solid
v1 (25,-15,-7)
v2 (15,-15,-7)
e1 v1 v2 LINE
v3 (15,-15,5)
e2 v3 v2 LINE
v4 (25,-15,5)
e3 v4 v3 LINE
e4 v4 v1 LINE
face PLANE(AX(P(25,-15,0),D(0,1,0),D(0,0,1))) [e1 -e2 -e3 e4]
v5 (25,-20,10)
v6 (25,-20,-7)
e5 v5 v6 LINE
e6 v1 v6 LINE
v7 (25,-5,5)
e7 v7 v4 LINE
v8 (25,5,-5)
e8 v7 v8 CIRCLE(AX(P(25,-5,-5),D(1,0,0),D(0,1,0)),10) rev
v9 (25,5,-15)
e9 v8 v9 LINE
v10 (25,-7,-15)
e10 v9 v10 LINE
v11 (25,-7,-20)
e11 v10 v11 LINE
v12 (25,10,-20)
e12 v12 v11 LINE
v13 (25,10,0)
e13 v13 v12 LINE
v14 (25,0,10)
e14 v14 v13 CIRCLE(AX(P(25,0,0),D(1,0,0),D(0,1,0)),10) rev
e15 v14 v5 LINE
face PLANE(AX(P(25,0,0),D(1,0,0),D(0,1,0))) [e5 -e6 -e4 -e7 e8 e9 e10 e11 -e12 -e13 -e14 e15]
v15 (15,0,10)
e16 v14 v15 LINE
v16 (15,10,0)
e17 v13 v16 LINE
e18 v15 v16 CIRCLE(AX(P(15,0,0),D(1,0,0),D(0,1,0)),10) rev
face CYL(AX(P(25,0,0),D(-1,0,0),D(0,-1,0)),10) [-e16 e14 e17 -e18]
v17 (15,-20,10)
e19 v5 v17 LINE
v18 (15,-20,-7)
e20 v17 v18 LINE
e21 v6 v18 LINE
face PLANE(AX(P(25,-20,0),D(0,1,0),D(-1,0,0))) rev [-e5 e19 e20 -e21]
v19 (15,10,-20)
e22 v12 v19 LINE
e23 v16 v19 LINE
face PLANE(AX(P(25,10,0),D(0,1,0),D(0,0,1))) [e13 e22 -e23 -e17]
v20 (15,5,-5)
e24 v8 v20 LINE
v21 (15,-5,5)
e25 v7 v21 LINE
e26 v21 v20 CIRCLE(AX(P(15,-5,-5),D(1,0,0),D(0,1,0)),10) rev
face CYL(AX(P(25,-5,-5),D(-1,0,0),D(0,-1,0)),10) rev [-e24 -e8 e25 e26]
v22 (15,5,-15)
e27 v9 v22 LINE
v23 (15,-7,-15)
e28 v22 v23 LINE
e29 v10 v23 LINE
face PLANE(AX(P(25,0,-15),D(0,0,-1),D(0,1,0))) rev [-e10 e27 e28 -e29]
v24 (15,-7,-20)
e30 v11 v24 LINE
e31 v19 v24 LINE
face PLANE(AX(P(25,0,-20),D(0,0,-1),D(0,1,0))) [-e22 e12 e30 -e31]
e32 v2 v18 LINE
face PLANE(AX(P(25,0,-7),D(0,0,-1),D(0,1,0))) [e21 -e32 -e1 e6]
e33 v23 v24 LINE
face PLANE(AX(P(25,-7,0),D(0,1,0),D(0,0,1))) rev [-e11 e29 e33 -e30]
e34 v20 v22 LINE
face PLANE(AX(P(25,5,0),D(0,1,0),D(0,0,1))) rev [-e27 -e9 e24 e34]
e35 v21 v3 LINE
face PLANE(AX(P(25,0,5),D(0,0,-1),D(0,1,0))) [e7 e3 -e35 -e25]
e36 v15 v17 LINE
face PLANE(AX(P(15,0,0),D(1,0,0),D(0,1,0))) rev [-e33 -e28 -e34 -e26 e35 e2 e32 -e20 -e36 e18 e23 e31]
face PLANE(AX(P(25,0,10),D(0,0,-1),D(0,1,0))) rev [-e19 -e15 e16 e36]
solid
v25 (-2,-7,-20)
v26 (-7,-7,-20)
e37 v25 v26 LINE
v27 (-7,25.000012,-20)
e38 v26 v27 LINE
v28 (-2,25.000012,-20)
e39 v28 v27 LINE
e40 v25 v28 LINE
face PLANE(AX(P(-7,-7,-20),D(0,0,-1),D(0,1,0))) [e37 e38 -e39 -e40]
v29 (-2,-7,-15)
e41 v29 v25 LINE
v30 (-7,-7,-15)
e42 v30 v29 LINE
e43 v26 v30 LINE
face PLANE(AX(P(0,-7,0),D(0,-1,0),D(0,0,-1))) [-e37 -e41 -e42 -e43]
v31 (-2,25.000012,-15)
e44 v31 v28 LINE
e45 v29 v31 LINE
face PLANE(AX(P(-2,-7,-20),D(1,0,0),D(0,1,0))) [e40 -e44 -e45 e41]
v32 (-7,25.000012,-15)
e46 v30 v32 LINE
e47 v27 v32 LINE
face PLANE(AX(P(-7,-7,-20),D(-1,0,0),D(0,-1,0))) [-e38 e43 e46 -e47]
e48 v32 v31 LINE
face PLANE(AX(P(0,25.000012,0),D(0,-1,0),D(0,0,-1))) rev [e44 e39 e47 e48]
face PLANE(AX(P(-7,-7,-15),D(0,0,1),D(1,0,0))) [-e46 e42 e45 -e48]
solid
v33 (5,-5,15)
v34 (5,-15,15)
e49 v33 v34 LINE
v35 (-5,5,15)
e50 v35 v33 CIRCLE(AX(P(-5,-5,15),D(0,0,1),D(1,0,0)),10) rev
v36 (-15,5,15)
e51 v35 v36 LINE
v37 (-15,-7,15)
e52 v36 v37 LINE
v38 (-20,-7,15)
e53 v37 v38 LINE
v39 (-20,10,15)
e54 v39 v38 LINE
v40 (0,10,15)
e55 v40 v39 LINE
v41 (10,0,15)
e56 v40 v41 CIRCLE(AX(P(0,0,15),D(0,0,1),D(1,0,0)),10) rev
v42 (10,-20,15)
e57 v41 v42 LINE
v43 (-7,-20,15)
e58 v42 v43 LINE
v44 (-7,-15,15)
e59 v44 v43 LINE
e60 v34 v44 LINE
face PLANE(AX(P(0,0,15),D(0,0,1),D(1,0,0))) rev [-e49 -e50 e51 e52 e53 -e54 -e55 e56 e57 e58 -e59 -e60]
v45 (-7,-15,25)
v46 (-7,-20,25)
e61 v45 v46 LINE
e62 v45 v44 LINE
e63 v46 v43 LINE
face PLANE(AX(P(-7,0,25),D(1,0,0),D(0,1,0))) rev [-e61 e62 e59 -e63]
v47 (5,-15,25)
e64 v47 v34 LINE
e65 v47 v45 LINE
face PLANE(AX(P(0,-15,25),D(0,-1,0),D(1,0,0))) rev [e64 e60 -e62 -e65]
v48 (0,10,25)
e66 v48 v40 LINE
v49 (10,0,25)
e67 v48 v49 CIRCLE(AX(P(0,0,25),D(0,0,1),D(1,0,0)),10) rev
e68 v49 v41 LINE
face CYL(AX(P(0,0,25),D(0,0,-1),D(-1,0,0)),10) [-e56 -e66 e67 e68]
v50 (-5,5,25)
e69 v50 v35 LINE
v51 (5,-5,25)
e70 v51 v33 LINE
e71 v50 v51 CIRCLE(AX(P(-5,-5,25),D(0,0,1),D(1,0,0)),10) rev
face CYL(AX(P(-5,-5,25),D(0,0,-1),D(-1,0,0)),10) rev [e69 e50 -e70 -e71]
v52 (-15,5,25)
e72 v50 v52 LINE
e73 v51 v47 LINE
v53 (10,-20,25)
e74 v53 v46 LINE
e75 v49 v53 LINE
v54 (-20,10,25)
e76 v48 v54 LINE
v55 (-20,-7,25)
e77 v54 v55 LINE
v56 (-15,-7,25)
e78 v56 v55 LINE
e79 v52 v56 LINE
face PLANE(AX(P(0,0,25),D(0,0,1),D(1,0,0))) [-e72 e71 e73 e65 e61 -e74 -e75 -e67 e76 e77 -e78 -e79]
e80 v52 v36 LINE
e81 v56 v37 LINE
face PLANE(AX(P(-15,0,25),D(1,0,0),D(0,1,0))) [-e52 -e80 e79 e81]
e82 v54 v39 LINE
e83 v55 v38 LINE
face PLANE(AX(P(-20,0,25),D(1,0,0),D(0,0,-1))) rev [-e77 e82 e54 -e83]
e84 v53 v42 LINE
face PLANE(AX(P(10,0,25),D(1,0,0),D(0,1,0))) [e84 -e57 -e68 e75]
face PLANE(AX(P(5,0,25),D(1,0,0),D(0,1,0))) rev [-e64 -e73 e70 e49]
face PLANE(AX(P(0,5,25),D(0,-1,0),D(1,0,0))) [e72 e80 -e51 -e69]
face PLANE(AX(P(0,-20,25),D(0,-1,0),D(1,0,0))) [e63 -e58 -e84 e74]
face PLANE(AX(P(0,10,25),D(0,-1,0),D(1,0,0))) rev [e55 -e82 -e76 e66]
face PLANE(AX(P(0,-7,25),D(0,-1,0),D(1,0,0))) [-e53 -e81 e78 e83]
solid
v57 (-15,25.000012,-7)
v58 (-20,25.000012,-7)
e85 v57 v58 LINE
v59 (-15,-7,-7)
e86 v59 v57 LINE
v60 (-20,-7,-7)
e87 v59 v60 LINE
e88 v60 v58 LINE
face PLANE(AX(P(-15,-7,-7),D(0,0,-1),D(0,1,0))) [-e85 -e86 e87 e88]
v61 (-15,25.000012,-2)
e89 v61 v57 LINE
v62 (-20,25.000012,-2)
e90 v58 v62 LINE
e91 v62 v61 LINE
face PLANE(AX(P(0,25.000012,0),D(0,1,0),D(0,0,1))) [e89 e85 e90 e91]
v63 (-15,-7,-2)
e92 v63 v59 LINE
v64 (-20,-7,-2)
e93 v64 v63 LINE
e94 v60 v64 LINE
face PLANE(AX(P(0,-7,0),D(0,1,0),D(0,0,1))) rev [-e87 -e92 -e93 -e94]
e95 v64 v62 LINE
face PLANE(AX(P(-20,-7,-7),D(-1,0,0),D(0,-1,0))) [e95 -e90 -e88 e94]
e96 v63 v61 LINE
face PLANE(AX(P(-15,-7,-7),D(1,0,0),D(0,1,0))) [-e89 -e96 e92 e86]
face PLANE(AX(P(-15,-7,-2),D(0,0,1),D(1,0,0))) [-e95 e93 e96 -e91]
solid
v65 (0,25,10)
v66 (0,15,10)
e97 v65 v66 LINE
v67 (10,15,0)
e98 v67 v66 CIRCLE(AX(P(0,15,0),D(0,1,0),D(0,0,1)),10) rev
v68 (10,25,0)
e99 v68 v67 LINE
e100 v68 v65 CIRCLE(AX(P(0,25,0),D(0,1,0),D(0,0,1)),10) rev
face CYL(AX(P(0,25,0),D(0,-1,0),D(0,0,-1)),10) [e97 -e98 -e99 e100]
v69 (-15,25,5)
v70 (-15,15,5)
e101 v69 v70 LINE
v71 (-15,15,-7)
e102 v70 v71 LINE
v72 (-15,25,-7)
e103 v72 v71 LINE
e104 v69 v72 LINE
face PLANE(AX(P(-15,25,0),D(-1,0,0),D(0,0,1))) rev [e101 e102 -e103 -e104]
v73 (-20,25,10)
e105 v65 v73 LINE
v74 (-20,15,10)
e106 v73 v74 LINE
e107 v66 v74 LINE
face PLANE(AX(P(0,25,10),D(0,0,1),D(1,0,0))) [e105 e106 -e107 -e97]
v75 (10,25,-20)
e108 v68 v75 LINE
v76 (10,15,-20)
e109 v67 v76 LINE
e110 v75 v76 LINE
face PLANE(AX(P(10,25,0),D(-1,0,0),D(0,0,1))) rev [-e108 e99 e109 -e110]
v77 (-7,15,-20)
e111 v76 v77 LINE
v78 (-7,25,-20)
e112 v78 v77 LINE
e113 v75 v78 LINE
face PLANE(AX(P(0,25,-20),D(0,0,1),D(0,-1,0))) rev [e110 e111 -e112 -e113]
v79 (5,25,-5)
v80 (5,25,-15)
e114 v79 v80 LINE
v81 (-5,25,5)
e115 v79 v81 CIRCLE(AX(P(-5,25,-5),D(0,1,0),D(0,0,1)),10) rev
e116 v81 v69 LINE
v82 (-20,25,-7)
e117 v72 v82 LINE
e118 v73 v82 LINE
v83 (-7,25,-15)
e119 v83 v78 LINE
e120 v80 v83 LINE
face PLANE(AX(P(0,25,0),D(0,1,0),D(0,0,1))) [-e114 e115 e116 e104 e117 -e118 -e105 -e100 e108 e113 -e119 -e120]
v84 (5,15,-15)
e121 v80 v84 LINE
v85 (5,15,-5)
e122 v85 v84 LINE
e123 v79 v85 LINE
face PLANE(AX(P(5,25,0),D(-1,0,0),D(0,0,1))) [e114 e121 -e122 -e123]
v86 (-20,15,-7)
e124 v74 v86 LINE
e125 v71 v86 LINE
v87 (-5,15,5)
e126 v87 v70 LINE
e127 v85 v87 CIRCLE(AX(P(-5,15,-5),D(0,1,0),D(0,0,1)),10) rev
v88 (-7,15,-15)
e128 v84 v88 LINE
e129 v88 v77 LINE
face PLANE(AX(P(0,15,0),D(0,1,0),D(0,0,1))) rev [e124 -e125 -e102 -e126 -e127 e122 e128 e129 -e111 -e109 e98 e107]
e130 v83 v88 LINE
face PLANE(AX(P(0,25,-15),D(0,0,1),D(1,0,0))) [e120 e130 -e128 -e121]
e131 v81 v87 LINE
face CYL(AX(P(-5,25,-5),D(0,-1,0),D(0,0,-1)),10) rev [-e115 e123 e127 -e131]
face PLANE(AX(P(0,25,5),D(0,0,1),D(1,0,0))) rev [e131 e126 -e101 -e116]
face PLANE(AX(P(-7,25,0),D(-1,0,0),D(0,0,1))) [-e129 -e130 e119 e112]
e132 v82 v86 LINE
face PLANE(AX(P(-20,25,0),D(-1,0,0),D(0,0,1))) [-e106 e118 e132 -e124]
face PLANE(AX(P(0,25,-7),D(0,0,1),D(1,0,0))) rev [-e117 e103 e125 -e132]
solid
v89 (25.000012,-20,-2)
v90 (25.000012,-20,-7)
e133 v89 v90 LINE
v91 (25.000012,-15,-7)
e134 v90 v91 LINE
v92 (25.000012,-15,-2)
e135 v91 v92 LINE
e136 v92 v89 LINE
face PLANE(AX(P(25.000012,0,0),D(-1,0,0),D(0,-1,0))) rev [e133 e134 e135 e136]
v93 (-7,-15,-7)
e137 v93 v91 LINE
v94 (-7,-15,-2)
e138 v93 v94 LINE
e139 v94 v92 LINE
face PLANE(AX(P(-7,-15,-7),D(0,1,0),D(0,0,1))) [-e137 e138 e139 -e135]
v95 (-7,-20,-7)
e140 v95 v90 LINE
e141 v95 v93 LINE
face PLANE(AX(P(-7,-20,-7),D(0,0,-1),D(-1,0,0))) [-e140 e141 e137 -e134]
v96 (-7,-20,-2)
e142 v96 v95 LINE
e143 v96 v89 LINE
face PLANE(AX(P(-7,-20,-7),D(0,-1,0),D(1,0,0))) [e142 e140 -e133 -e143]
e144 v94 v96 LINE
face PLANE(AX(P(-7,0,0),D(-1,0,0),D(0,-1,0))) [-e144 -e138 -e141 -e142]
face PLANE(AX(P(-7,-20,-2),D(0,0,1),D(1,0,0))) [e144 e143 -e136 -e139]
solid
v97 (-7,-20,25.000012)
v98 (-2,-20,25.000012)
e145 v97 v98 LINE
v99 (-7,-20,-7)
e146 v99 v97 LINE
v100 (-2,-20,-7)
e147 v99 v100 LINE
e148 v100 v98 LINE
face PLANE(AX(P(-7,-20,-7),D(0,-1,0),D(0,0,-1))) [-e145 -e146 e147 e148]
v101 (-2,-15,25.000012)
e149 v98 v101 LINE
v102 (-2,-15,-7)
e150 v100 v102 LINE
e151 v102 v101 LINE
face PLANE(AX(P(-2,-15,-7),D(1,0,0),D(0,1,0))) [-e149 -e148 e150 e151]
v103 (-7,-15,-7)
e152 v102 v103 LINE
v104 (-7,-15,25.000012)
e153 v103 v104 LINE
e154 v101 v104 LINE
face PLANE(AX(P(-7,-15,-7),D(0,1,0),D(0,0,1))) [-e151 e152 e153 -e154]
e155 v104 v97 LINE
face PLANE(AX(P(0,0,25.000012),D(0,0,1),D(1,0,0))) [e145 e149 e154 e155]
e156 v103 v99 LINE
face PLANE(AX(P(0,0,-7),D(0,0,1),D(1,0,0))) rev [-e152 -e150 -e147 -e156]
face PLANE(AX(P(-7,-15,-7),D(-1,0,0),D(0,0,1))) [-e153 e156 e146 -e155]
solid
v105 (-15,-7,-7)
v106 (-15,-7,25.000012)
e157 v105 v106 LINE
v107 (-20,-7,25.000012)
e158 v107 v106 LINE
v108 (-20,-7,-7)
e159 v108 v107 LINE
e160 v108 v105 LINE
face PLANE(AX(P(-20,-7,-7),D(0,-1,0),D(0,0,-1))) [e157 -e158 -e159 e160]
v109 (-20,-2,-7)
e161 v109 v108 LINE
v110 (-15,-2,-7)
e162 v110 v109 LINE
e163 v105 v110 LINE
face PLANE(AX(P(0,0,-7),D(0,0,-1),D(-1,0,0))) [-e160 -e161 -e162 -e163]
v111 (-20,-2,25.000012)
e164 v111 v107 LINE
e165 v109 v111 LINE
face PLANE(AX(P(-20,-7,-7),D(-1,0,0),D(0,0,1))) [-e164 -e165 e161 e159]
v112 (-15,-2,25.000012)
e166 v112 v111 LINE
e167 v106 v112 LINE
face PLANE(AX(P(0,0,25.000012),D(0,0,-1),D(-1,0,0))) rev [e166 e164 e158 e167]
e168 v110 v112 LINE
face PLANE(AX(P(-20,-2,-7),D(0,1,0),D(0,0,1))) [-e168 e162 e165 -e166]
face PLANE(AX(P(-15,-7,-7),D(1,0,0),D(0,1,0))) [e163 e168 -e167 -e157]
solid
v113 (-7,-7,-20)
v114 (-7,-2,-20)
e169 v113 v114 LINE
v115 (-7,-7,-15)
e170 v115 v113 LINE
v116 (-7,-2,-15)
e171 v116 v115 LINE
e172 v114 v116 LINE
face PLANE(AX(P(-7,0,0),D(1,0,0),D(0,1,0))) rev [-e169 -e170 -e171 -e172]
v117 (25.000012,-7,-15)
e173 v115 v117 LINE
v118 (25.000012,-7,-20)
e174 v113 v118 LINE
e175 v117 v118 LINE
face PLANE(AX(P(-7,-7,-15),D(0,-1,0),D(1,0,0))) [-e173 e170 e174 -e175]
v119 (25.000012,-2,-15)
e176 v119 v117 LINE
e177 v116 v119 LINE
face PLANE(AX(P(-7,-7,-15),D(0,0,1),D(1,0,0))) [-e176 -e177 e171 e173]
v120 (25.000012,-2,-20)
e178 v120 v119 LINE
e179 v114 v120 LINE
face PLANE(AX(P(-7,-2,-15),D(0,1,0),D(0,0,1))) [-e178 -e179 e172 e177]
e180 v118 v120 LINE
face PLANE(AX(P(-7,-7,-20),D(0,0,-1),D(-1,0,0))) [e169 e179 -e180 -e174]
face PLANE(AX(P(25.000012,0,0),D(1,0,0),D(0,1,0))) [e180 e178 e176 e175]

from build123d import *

# Parameters (mm, degrees)
BOSS_EXTRUDE1_DEPTH         = 10
BOSS_EXTRUDE2_START         = -32
SKETCH4_W                   = 5
SKETCH4_H                   = 5
BOSS_EXTRUDE2_DEPTH         = 32.000012
BOSS_EXTRUDE2_2_DEPTH       = 32.000012
BODY_MOVE_COPY2_START       = -7
BODY_MOVE_COPY2_OUTLINE_W   = 5
BODY_MOVE_COPY2_OUTLINE_H   = 32.000012
BODY_MOVE_COPY2_DEPTH       = 5
BODY_MOVE_COPY2_2_OUTLINE_W = 32.000012
BODY_MOVE_COPY2_2_OUTLINE_H = 5
BODY_MOVE_COPY2_2_DEPTH     = 5
BODY_MOVE_COPY2_START_2     = -20
BODY_MOVE_COPY2_3_OUTLINE_W = 5
BODY_MOVE_COPY2_3_OUTLINE_H = 32.000012
BODY_MOVE_COPY2_3_DEPTH     = 5
BODY_MOVE_COPY2_4_OUTLINE_W = 32.000012
BODY_MOVE_COPY2_4_OUTLINE_H = 5
BODY_MOVE_COPY2_4_DEPTH     = 5
BODY_MOVE_COPY2_START_3     = 15
BODY_MOVE_COPY2_5_DEPTH     = 10
BODY_MOVE_COPY2_6_DEPTH     = 10


# Read off the part's stored shape, not the designer's step: Body-Move/Copy2
with BuildPart() as part:
    # Sketch2 → Boss-Extrude1 (new body)
    with BuildSketch(Plane.XY.offset(15)):
        with BuildLine():
            ThreePointArc((0, 10), (7.071067812, 7.071067812), (10, 0))
            Line((10, 0), (10, -20))
            Line((10, -20), (-7, -20))
            Line((-7, -20), (-7, -15))
            Line((-7, -15), (5, -15))
            Line((5, -15), (5, -5))
            ThreePointArc((5, -5), (2.071067812, 2.071067812), (-5, 5))
            Line((-5, 5), (-15, 5))
            Line((-15, 5), (-15, -7))
            Line((-15, -7), (-20, -7))
            Line((-20, -7), (-20, 10))
            Line((-20, 10), (0, 10))
        make_face()
    extrude(amount=BOSS_EXTRUDE1_DEPTH)


with BuildPart() as body_2:
    # Sketch4 → Boss-Extrude2 (new body)
    with BuildSketch(Plane.XY.offset(25).offset(BOSS_EXTRUDE2_START)):
        with Locations((-17.5, -4.5)):
            Rectangle(SKETCH4_W, SKETCH4_H)
    extrude(amount=BOSS_EXTRUDE2_DEPTH)


with BuildPart() as body_3:
    # Sketch4 → Boss-Extrude2 2 (new body)
    with BuildSketch(Plane.XY.offset(25).offset(BOSS_EXTRUDE2_START)):
        with Locations((-4.5, -17.5)):
            Rectangle(SKETCH4_W, SKETCH4_H)
    extrude(amount=BOSS_EXTRUDE2_2_DEPTH)


with BuildPart() as body_4:
    # Body-Move/Copy2 outline → Body-Move/Copy2 (new body)
    with BuildSketch(Plane.XY.offset(BODY_MOVE_COPY2_START)):
        with Locations((-17.5, 9.000006)):
            Rectangle(BODY_MOVE_COPY2_OUTLINE_W, BODY_MOVE_COPY2_OUTLINE_H)
    extrude(amount=BODY_MOVE_COPY2_DEPTH)


with BuildPart() as body_5:
    # Body-Move_Copy2 2 outline → Body-Move_Copy2 2 (new body)
    with BuildSketch(Plane(origin=(0, 0, 0), x_dir=(1, 0, 0), z_dir=(0, 1, 0)).offset(BODY_MOVE_COPY2_START)):
        with Locations((9.000006, 17.5)):
            Rectangle(BODY_MOVE_COPY2_2_OUTLINE_W, BODY_MOVE_COPY2_2_OUTLINE_H)
    extrude(amount=BODY_MOVE_COPY2_2_DEPTH)


with BuildPart() as body_6:
    # Body-Move_Copy2 3 outline → Body-Move_Copy2 3 (new body)
    with BuildSketch(Plane.XY.offset(BODY_MOVE_COPY2_START_2)):
        with Locations((-4.5, 9.000006)):
            Rectangle(BODY_MOVE_COPY2_3_OUTLINE_W, BODY_MOVE_COPY2_3_OUTLINE_H)
    extrude(amount=BODY_MOVE_COPY2_3_DEPTH)


with BuildPart() as body_7:
    # Body-Move_Copy2 4 outline → Body-Move_Copy2 4 (new body)
    with BuildSketch(Plane(origin=(0, 0, 0), x_dir=(1, 0, 0), z_dir=(0, 1, 0)).offset(BODY_MOVE_COPY2_START_2)):
        with Locations((9.000006, 4.5)):
            Rectangle(BODY_MOVE_COPY2_4_OUTLINE_W, BODY_MOVE_COPY2_4_OUTLINE_H)
    extrude(amount=BODY_MOVE_COPY2_4_DEPTH)


with BuildPart() as body_8:
    # Body-Move_Copy2 5 outline → Body-Move_Copy2 5 (new body)
    with BuildSketch(Plane(origin=(0, 0, 0), x_dir=(1, 0, 0), z_dir=(0, 1, 0)).offset(BODY_MOVE_COPY2_START_3)):
        with BuildLine():
            ThreePointArc((0, -10), (7.071067812, -7.071067812), (10, 0))
            Line((10, 0), (10, 20))
            Line((10, 20), (-7, 20))
            Line((-7, 20), (-7, 15))
            Line((-7, 15), (5, 15))
            Line((5, 15), (5, 5))
            ThreePointArc((5, 5), (2.071067812, -2.071067812), (-5, -5))
            Line((-5, -5), (-15, -5))
            Line((-15, -5), (-15, 7))
            Line((-15, 7), (-20, 7))
            Line((-20, 7), (-20, -10))
            Line((-20, -10), (0, -10))
        make_face()
    extrude(amount=BODY_MOVE_COPY2_5_DEPTH)


with BuildPart() as body_9:
    # Body-Move_Copy2 6 outline → Body-Move_Copy2 6 (new body)
    with BuildSketch(Plane.YZ.offset(BODY_MOVE_COPY2_START_3)):
        with BuildLine():
            ThreePointArc((10, 0), (7.071067812, 7.071067812), (0, 10))
            Line((0, 10), (-20, 10))
            Line((-20, 10), (-20, -7))
            Line((-20, -7), (-15, -7))
            Line((-15, -7), (-15, 5))
            Line((-15, 5), (-5, 5))
            ThreePointArc((-5, 5), (2.071067812, 2.071067812), (5, -5))
            Line((5, -5), (5, -15))
            Line((5, -15), (-7, -15))
            Line((-7, -15), (-7, -20))
            Line((-7, -20), (10, -20))
            Line((10, -20), (10, 0))
        make_face()
    extrude(amount=BODY_MOVE_COPY2_6_DEPTH)


solid = Compound([part.part, body_2.part, body_3.part, body_4.part, body_5.part, body_6.part, body_7.part, body_8.part, body_9.part])
